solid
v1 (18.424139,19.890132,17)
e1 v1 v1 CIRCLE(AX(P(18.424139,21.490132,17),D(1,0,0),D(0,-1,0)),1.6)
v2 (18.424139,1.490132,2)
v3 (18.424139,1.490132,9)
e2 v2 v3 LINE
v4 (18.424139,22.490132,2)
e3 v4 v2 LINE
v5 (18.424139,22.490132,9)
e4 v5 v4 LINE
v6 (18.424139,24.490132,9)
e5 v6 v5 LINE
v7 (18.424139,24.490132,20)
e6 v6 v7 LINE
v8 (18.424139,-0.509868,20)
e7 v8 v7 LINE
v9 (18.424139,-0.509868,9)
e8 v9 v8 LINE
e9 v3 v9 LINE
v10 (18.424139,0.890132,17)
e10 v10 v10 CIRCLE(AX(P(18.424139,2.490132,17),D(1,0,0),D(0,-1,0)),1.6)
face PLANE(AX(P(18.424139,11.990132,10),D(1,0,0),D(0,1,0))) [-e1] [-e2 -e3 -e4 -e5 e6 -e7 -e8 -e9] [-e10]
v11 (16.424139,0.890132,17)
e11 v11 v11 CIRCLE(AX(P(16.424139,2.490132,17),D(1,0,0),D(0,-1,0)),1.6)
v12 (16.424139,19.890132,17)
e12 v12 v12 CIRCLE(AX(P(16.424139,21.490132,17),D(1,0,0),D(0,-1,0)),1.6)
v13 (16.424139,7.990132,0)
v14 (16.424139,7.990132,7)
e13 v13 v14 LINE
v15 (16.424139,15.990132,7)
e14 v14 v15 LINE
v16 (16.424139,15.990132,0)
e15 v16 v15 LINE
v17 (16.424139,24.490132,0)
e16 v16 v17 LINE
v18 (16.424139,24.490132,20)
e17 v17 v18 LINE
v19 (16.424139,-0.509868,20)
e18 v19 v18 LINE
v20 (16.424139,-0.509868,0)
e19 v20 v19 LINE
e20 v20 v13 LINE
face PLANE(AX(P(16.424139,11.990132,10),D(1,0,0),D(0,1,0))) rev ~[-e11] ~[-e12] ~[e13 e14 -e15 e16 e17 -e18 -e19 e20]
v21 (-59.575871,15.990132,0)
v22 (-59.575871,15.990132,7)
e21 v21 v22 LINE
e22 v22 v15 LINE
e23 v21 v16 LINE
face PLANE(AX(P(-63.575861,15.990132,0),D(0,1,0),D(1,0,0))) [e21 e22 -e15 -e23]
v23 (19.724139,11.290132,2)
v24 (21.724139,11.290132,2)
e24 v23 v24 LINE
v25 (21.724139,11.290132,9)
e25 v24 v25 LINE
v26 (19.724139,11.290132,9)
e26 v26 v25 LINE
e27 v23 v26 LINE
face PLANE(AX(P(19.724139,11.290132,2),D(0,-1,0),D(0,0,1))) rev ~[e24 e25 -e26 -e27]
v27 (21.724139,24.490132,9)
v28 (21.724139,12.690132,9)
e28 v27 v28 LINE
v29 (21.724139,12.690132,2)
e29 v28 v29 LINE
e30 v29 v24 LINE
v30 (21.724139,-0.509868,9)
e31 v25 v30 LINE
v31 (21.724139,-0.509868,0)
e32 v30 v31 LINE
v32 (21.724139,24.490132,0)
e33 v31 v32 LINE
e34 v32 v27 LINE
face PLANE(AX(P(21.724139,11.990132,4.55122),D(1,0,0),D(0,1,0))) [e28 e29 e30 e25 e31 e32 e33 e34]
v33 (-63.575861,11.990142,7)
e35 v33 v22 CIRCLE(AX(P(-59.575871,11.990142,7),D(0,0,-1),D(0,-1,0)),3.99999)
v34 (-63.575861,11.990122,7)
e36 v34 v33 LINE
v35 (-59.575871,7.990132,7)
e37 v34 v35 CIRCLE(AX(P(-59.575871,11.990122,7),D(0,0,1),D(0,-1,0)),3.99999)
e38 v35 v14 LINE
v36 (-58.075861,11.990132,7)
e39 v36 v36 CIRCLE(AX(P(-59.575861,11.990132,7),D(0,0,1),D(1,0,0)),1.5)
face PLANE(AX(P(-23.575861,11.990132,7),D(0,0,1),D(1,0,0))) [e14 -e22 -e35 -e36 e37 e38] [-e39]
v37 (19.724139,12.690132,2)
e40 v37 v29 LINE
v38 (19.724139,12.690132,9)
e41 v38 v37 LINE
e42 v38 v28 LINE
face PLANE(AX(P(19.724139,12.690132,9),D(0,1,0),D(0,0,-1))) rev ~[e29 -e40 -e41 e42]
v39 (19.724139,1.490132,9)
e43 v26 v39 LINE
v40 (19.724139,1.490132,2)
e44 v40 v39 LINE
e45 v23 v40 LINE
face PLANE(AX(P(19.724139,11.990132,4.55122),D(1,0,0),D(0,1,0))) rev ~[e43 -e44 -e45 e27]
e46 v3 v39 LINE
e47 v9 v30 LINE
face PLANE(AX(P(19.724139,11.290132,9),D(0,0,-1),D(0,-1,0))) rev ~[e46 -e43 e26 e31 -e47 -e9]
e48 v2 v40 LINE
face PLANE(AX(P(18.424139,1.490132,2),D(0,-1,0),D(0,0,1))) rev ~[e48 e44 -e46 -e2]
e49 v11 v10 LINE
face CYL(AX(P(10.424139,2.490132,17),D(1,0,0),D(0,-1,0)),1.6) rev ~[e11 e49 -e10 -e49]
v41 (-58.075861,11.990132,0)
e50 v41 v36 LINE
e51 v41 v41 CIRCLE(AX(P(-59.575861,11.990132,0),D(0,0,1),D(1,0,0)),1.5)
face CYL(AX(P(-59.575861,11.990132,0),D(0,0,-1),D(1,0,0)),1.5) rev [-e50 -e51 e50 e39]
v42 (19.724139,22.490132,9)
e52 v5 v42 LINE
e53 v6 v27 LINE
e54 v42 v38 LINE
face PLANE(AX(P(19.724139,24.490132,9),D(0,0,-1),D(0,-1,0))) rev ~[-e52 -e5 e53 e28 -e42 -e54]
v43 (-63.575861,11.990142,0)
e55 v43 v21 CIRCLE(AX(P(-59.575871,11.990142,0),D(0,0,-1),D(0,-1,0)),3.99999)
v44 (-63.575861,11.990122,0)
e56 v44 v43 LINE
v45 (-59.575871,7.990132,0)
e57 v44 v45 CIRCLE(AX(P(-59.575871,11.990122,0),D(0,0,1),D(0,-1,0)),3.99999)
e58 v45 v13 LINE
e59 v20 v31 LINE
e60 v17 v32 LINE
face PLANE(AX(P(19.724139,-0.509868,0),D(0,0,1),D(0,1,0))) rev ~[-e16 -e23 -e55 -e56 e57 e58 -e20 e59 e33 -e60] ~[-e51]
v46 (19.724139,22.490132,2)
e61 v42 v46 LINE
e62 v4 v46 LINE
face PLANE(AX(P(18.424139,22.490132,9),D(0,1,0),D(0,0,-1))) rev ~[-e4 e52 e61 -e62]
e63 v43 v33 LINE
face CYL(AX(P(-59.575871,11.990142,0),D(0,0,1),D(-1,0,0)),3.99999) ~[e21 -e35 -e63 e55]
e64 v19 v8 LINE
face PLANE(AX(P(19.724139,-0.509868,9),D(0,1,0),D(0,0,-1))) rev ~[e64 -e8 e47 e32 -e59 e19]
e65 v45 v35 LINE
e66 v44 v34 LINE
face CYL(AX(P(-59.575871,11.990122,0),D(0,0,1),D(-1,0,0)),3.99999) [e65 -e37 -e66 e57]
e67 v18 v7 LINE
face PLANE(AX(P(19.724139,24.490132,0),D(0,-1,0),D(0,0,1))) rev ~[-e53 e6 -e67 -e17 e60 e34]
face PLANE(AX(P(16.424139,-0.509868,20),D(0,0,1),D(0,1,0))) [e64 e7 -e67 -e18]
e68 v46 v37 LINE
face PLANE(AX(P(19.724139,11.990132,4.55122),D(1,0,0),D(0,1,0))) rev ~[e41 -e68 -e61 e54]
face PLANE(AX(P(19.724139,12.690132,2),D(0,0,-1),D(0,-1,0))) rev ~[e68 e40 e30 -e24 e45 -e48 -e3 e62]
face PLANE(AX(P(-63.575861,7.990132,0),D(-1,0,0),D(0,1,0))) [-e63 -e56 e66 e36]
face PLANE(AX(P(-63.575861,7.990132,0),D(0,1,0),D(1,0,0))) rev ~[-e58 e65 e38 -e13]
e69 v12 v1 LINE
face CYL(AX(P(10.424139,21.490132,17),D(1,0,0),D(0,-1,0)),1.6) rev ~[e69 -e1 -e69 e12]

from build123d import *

# Parameters (mm, degrees)
F0_W     = 80
F0_H     = 8
F0_R     = 1.5
F1_DEPTH = 7
F2_R     = 3.99999
F3_W     = 25
F3_H     = 20
F4_DEPTH = 2
F6_DEPTH = 1.3
F8_DEPTH = 2
F9_D     = 3.2
F9_DEPTH = 6
F9_TIP   = 0.9613769904


# Not quite as in the source:
# - a fillet or chamfer is up to 0.001 mm smaller than in the source, because OpenCascade refuses the exact size


with BuildPart() as f1:
    # F0 (on Top) → F1 (new body)
    with BuildSketch(Plane.XY):
        with Locations((-23.5758614609, 11.990132276)):
            Rectangle(F0_W, F0_H)
        with Locations((-59.5758614609, 11.990132276)):
            Circle(F0_R, mode=Mode.SUBTRACT)
    extrude(amount=F1_DEPTH)

    # F2 (radius 4 in the source; OpenCascade refuses exactly that, so slightly less here)
    f2_edges = [f1.edges().sort_by_distance(p)[0] for p in [
        (-63.575861, 15.990132, 3.5),
        (-63.575861, 7.990132, 3.5),
    ]]
    fillet(f2_edges, radius=F2_R)

    # F3 (on face) → F4 (join)
    with BuildSketch(Plane.YZ.offset(16.4241385391)):
        with Locations((11.990132276, 10)):
            Rectangle(F3_W, F3_H)
    extrude(amount=F4_DEPTH)

    # F5 (on face) → F6 (join)
    with BuildSketch(Plane.YZ.offset(18.4241385391)):
        Polygon((1.490132276, 9), (-0.509867724, 9), (-0.509867724, 0), (24.490132276, 0), (24.490132276, 9), (22.490132276, 9), (22.490132276, 2), (1.490132276, 2), align=None)
    extrude(amount=F6_DEPTH)

    # F7 (on face) → F8 (join)
    with BuildSketch(Plane.YZ.offset(19.7241385391)):
        Polygon((11.290132276, 9), (-0.509867724, 9), (-0.509867724, 0), (24.490132276, 0), (24.490132276, 9), (12.690132276, 9), (12.690132276, 2), (11.290132276, 2), align=None)
    extrude(amount=F8_DEPTH)

    # F9
    with Locations(Plane(origin=(16.4241385391, 0, 0), x_dir=(0, 1, 0), z_dir=(-1, 0, 0))):
        with Locations((2.490132276, -17), (21.490132276, -17)):
            Hole(F9_D / 2, depth=F9_DEPTH)
            with Locations((0, 0, -(F9_DEPTH + F9_TIP / 2))):  # 118° drill point
                Cone(0, F9_D / 2, F9_TIP, mode=Mode.SUBTRACT)


solid = f1.part
